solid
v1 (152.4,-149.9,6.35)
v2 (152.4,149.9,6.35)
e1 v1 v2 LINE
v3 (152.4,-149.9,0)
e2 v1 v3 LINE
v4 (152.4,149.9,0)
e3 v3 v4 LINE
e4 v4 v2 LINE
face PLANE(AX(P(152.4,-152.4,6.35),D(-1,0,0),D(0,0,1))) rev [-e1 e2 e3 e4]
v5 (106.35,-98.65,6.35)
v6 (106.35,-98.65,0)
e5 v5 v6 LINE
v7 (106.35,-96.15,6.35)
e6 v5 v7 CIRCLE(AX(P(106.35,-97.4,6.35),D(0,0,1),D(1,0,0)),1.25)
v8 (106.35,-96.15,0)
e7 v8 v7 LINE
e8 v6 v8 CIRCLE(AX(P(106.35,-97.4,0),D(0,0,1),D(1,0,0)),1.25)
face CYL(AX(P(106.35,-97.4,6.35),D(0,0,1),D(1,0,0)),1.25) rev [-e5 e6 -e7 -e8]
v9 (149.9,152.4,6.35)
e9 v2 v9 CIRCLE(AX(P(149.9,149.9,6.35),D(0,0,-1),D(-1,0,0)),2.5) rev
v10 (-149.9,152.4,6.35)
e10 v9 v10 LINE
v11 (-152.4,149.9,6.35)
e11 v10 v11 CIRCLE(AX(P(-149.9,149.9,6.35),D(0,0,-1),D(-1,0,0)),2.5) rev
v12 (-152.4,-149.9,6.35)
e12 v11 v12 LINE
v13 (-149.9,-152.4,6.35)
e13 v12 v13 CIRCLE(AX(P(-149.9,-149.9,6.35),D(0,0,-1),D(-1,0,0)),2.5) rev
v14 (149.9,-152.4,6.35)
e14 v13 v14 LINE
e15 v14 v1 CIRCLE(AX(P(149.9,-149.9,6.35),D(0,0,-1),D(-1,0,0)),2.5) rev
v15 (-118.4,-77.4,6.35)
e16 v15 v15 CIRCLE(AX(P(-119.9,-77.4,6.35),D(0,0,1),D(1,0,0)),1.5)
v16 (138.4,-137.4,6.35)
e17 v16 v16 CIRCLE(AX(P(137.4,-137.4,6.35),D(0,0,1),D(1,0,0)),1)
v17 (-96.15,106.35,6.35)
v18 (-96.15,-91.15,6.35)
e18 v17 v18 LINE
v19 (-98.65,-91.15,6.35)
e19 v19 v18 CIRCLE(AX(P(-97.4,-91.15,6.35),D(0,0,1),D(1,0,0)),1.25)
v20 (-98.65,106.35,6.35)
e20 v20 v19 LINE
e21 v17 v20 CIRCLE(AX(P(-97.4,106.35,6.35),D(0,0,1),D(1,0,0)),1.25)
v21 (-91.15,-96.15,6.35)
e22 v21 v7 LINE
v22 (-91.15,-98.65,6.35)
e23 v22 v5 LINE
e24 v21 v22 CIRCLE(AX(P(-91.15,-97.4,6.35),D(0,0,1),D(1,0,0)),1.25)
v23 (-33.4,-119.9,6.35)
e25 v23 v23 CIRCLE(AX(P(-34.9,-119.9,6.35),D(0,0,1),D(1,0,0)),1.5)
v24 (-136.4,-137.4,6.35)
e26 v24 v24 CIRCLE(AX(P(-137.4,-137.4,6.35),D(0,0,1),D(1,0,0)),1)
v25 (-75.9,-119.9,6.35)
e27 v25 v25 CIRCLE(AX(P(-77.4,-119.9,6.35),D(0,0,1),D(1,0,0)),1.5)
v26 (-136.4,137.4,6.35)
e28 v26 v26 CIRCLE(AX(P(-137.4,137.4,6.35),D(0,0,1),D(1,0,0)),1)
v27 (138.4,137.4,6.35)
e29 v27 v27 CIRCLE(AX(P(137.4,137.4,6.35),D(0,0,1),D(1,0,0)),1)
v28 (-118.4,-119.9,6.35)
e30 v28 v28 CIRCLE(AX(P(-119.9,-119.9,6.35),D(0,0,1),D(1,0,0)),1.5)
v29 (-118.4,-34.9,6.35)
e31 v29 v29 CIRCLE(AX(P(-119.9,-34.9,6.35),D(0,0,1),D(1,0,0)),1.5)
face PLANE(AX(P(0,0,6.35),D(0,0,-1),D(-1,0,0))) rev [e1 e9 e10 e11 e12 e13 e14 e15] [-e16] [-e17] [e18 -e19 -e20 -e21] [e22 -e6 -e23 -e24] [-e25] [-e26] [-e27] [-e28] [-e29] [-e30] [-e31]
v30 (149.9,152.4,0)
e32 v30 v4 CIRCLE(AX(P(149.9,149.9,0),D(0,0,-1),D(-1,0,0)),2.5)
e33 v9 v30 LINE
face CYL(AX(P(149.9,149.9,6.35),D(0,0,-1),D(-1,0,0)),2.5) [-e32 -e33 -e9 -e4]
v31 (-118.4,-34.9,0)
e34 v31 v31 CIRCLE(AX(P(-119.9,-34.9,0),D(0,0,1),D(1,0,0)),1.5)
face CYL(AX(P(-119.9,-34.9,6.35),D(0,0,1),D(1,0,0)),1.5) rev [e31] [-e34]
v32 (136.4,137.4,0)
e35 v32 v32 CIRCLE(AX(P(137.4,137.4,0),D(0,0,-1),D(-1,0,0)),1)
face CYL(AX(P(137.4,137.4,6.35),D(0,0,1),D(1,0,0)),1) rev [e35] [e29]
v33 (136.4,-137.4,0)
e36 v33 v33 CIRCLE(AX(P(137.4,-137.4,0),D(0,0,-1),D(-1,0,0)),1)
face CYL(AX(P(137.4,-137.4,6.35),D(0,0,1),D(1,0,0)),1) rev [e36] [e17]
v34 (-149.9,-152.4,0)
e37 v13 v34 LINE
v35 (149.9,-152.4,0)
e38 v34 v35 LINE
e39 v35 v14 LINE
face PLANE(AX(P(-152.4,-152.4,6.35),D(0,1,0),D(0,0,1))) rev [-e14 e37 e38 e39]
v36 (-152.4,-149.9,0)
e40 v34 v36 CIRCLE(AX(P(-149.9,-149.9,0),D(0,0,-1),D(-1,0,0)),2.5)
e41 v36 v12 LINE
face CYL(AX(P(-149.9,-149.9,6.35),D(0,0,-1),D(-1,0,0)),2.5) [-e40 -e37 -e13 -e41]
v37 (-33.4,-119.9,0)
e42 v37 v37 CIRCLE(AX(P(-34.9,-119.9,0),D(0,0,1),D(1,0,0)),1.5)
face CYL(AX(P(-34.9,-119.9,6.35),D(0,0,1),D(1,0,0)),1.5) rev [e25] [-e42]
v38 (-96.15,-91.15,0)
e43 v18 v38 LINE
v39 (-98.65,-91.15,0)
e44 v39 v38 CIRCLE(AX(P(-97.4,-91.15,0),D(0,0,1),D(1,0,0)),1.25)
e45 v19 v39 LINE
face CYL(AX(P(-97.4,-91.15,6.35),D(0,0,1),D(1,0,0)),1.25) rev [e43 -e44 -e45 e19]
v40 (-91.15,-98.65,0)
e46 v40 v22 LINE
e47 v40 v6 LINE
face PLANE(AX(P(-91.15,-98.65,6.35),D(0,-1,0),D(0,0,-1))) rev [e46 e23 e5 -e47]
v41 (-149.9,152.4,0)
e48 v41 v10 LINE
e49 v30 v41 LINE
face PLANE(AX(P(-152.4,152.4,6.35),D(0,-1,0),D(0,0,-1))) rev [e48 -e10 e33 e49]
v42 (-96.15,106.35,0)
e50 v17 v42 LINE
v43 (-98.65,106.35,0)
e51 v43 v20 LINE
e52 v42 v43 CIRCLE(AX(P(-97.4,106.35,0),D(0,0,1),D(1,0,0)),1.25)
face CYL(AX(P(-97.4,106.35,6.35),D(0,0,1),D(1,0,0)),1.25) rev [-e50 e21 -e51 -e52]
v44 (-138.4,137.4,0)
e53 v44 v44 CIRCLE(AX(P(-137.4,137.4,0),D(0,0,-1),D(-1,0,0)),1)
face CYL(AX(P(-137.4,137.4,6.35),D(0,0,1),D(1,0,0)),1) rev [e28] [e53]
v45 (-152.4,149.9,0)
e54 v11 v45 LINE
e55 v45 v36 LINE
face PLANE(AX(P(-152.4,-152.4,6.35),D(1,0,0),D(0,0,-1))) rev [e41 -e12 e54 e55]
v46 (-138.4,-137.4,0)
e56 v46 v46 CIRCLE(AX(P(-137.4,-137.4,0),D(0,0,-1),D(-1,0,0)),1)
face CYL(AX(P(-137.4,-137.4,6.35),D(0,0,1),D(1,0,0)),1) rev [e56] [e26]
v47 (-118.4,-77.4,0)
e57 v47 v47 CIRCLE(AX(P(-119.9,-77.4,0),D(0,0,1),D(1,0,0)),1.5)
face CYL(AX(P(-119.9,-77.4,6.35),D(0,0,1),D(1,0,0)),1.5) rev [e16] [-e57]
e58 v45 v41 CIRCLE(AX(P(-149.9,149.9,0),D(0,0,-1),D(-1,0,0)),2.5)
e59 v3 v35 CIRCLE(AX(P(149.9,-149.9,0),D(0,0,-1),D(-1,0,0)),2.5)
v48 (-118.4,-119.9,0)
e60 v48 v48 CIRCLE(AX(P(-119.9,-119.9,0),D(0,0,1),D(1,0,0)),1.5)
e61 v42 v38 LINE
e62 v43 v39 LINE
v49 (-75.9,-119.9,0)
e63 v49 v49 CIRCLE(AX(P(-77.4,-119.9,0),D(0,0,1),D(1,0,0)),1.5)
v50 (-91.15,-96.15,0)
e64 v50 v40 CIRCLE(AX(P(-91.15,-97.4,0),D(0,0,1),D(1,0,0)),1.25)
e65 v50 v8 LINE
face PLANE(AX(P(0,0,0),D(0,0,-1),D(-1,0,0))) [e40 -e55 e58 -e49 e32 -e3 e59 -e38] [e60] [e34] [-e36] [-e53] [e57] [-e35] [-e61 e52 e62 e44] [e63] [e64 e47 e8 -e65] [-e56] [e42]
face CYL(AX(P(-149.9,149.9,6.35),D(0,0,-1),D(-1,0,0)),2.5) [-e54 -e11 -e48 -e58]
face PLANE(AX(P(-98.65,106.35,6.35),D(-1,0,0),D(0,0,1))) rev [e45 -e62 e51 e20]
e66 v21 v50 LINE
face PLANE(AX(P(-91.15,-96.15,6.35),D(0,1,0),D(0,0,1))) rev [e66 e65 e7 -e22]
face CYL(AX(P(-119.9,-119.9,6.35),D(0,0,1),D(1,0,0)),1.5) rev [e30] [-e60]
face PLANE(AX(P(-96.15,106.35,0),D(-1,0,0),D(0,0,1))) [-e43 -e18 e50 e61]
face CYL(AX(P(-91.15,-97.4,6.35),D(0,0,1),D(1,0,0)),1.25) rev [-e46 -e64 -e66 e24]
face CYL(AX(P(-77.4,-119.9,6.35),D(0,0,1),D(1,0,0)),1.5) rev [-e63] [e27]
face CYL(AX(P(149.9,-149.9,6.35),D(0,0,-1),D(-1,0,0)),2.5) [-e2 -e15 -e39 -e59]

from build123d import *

# Parameters (mm, degrees)
SKETCH1_W                = 304.8
SKETCH1_H                = 304.8
BOSS_EXTRUDE1_DEPTH      = 6.35
M3_CLEARANCE_HOLE2_D     = 2
FILLET1_R                = 2.5
M3_CLEARANCE_SLOT1_DEPTH = 6.35
M3_CLEARANCE_SLOT2_DEPTH = 6.35
M3_CLEARANCE_HOLE1_D     = 3


# Read off the part's stored shape, not the designer's step: M3 Clearance Slot1, M3 Clearance Slot2
with BuildPart() as part:
    # Sketch1 → Boss-Extrude1 (new body)
    with BuildSketch(Plane.XY):
        Rectangle(SKETCH1_W, SKETCH1_H)
    extrude(amount=BOSS_EXTRUDE1_DEPTH)

    # M3 Clearance Hole2 (through all)
    with Locations(Plane.XY.offset(6.35)):
        with Locations((137.4, 137.4), (-137.4, -137.4), (137.4, -137.4), (-137.4, 137.4)):
            Hole(M3_CLEARANCE_HOLE2_D / 2)

    # Fillet1
    fillet1_edges = [part.edges().sort_by_distance(p)[0] for p in [
        (152.4, -152.4, 3.175),
        (-152.4, -152.4, 3.175),
        (-152.4, 152.4, 3.175),
        (152.4, 152.4, 3.175),
    ]]
    fillet(fillet1_edges, radius=FILLET1_R)

    # M3 Clearance Slot1 outline → M3 Clearance Slot1 (cut)
    with BuildSketch(Plane.XY):
        with BuildLine():
            Line((-91.15, -98.65), (106.35, -98.65))
            ThreePointArc((106.35, -98.65), (107.6, -97.4), (106.35, -96.15))
            Line((106.35, -96.15), (-91.15, -96.15))
            ThreePointArc((-91.15, -96.15), (-92.4, -97.4), (-91.15, -98.65))
        make_face()
    extrude(amount=M3_CLEARANCE_SLOT1_DEPTH, mode=Mode.SUBTRACT)

    # M3 Clearance Slot2 outline → M3 Clearance Slot2 (cut)
    with BuildSketch(Plane.XY):
        with BuildLine():
            Line((-98.65, 106.35), (-98.65, -91.15))
            ThreePointArc((-98.65, -91.15), (-97.4, -92.4), (-96.15, -91.15))
            Line((-96.15, -91.15), (-96.15, 106.35))
            ThreePointArc((-96.15, 106.35), (-97.4, 107.6), (-98.65, 106.35))
        make_face()
    extrude(amount=M3_CLEARANCE_SLOT2_DEPTH, mode=Mode.SUBTRACT)

    # M3 Clearance Hole1 (through all)
    with Locations(Plane.XY.offset(6.35)):
        with Locations((-34.9, -119.9), (-77.4, -119.9), (-119.9, -119.9), (-119.9, -77.4), (-119.9, -34.9)):
            Hole(M3_CLEARANCE_HOLE1_D / 2)


solid = part.part
